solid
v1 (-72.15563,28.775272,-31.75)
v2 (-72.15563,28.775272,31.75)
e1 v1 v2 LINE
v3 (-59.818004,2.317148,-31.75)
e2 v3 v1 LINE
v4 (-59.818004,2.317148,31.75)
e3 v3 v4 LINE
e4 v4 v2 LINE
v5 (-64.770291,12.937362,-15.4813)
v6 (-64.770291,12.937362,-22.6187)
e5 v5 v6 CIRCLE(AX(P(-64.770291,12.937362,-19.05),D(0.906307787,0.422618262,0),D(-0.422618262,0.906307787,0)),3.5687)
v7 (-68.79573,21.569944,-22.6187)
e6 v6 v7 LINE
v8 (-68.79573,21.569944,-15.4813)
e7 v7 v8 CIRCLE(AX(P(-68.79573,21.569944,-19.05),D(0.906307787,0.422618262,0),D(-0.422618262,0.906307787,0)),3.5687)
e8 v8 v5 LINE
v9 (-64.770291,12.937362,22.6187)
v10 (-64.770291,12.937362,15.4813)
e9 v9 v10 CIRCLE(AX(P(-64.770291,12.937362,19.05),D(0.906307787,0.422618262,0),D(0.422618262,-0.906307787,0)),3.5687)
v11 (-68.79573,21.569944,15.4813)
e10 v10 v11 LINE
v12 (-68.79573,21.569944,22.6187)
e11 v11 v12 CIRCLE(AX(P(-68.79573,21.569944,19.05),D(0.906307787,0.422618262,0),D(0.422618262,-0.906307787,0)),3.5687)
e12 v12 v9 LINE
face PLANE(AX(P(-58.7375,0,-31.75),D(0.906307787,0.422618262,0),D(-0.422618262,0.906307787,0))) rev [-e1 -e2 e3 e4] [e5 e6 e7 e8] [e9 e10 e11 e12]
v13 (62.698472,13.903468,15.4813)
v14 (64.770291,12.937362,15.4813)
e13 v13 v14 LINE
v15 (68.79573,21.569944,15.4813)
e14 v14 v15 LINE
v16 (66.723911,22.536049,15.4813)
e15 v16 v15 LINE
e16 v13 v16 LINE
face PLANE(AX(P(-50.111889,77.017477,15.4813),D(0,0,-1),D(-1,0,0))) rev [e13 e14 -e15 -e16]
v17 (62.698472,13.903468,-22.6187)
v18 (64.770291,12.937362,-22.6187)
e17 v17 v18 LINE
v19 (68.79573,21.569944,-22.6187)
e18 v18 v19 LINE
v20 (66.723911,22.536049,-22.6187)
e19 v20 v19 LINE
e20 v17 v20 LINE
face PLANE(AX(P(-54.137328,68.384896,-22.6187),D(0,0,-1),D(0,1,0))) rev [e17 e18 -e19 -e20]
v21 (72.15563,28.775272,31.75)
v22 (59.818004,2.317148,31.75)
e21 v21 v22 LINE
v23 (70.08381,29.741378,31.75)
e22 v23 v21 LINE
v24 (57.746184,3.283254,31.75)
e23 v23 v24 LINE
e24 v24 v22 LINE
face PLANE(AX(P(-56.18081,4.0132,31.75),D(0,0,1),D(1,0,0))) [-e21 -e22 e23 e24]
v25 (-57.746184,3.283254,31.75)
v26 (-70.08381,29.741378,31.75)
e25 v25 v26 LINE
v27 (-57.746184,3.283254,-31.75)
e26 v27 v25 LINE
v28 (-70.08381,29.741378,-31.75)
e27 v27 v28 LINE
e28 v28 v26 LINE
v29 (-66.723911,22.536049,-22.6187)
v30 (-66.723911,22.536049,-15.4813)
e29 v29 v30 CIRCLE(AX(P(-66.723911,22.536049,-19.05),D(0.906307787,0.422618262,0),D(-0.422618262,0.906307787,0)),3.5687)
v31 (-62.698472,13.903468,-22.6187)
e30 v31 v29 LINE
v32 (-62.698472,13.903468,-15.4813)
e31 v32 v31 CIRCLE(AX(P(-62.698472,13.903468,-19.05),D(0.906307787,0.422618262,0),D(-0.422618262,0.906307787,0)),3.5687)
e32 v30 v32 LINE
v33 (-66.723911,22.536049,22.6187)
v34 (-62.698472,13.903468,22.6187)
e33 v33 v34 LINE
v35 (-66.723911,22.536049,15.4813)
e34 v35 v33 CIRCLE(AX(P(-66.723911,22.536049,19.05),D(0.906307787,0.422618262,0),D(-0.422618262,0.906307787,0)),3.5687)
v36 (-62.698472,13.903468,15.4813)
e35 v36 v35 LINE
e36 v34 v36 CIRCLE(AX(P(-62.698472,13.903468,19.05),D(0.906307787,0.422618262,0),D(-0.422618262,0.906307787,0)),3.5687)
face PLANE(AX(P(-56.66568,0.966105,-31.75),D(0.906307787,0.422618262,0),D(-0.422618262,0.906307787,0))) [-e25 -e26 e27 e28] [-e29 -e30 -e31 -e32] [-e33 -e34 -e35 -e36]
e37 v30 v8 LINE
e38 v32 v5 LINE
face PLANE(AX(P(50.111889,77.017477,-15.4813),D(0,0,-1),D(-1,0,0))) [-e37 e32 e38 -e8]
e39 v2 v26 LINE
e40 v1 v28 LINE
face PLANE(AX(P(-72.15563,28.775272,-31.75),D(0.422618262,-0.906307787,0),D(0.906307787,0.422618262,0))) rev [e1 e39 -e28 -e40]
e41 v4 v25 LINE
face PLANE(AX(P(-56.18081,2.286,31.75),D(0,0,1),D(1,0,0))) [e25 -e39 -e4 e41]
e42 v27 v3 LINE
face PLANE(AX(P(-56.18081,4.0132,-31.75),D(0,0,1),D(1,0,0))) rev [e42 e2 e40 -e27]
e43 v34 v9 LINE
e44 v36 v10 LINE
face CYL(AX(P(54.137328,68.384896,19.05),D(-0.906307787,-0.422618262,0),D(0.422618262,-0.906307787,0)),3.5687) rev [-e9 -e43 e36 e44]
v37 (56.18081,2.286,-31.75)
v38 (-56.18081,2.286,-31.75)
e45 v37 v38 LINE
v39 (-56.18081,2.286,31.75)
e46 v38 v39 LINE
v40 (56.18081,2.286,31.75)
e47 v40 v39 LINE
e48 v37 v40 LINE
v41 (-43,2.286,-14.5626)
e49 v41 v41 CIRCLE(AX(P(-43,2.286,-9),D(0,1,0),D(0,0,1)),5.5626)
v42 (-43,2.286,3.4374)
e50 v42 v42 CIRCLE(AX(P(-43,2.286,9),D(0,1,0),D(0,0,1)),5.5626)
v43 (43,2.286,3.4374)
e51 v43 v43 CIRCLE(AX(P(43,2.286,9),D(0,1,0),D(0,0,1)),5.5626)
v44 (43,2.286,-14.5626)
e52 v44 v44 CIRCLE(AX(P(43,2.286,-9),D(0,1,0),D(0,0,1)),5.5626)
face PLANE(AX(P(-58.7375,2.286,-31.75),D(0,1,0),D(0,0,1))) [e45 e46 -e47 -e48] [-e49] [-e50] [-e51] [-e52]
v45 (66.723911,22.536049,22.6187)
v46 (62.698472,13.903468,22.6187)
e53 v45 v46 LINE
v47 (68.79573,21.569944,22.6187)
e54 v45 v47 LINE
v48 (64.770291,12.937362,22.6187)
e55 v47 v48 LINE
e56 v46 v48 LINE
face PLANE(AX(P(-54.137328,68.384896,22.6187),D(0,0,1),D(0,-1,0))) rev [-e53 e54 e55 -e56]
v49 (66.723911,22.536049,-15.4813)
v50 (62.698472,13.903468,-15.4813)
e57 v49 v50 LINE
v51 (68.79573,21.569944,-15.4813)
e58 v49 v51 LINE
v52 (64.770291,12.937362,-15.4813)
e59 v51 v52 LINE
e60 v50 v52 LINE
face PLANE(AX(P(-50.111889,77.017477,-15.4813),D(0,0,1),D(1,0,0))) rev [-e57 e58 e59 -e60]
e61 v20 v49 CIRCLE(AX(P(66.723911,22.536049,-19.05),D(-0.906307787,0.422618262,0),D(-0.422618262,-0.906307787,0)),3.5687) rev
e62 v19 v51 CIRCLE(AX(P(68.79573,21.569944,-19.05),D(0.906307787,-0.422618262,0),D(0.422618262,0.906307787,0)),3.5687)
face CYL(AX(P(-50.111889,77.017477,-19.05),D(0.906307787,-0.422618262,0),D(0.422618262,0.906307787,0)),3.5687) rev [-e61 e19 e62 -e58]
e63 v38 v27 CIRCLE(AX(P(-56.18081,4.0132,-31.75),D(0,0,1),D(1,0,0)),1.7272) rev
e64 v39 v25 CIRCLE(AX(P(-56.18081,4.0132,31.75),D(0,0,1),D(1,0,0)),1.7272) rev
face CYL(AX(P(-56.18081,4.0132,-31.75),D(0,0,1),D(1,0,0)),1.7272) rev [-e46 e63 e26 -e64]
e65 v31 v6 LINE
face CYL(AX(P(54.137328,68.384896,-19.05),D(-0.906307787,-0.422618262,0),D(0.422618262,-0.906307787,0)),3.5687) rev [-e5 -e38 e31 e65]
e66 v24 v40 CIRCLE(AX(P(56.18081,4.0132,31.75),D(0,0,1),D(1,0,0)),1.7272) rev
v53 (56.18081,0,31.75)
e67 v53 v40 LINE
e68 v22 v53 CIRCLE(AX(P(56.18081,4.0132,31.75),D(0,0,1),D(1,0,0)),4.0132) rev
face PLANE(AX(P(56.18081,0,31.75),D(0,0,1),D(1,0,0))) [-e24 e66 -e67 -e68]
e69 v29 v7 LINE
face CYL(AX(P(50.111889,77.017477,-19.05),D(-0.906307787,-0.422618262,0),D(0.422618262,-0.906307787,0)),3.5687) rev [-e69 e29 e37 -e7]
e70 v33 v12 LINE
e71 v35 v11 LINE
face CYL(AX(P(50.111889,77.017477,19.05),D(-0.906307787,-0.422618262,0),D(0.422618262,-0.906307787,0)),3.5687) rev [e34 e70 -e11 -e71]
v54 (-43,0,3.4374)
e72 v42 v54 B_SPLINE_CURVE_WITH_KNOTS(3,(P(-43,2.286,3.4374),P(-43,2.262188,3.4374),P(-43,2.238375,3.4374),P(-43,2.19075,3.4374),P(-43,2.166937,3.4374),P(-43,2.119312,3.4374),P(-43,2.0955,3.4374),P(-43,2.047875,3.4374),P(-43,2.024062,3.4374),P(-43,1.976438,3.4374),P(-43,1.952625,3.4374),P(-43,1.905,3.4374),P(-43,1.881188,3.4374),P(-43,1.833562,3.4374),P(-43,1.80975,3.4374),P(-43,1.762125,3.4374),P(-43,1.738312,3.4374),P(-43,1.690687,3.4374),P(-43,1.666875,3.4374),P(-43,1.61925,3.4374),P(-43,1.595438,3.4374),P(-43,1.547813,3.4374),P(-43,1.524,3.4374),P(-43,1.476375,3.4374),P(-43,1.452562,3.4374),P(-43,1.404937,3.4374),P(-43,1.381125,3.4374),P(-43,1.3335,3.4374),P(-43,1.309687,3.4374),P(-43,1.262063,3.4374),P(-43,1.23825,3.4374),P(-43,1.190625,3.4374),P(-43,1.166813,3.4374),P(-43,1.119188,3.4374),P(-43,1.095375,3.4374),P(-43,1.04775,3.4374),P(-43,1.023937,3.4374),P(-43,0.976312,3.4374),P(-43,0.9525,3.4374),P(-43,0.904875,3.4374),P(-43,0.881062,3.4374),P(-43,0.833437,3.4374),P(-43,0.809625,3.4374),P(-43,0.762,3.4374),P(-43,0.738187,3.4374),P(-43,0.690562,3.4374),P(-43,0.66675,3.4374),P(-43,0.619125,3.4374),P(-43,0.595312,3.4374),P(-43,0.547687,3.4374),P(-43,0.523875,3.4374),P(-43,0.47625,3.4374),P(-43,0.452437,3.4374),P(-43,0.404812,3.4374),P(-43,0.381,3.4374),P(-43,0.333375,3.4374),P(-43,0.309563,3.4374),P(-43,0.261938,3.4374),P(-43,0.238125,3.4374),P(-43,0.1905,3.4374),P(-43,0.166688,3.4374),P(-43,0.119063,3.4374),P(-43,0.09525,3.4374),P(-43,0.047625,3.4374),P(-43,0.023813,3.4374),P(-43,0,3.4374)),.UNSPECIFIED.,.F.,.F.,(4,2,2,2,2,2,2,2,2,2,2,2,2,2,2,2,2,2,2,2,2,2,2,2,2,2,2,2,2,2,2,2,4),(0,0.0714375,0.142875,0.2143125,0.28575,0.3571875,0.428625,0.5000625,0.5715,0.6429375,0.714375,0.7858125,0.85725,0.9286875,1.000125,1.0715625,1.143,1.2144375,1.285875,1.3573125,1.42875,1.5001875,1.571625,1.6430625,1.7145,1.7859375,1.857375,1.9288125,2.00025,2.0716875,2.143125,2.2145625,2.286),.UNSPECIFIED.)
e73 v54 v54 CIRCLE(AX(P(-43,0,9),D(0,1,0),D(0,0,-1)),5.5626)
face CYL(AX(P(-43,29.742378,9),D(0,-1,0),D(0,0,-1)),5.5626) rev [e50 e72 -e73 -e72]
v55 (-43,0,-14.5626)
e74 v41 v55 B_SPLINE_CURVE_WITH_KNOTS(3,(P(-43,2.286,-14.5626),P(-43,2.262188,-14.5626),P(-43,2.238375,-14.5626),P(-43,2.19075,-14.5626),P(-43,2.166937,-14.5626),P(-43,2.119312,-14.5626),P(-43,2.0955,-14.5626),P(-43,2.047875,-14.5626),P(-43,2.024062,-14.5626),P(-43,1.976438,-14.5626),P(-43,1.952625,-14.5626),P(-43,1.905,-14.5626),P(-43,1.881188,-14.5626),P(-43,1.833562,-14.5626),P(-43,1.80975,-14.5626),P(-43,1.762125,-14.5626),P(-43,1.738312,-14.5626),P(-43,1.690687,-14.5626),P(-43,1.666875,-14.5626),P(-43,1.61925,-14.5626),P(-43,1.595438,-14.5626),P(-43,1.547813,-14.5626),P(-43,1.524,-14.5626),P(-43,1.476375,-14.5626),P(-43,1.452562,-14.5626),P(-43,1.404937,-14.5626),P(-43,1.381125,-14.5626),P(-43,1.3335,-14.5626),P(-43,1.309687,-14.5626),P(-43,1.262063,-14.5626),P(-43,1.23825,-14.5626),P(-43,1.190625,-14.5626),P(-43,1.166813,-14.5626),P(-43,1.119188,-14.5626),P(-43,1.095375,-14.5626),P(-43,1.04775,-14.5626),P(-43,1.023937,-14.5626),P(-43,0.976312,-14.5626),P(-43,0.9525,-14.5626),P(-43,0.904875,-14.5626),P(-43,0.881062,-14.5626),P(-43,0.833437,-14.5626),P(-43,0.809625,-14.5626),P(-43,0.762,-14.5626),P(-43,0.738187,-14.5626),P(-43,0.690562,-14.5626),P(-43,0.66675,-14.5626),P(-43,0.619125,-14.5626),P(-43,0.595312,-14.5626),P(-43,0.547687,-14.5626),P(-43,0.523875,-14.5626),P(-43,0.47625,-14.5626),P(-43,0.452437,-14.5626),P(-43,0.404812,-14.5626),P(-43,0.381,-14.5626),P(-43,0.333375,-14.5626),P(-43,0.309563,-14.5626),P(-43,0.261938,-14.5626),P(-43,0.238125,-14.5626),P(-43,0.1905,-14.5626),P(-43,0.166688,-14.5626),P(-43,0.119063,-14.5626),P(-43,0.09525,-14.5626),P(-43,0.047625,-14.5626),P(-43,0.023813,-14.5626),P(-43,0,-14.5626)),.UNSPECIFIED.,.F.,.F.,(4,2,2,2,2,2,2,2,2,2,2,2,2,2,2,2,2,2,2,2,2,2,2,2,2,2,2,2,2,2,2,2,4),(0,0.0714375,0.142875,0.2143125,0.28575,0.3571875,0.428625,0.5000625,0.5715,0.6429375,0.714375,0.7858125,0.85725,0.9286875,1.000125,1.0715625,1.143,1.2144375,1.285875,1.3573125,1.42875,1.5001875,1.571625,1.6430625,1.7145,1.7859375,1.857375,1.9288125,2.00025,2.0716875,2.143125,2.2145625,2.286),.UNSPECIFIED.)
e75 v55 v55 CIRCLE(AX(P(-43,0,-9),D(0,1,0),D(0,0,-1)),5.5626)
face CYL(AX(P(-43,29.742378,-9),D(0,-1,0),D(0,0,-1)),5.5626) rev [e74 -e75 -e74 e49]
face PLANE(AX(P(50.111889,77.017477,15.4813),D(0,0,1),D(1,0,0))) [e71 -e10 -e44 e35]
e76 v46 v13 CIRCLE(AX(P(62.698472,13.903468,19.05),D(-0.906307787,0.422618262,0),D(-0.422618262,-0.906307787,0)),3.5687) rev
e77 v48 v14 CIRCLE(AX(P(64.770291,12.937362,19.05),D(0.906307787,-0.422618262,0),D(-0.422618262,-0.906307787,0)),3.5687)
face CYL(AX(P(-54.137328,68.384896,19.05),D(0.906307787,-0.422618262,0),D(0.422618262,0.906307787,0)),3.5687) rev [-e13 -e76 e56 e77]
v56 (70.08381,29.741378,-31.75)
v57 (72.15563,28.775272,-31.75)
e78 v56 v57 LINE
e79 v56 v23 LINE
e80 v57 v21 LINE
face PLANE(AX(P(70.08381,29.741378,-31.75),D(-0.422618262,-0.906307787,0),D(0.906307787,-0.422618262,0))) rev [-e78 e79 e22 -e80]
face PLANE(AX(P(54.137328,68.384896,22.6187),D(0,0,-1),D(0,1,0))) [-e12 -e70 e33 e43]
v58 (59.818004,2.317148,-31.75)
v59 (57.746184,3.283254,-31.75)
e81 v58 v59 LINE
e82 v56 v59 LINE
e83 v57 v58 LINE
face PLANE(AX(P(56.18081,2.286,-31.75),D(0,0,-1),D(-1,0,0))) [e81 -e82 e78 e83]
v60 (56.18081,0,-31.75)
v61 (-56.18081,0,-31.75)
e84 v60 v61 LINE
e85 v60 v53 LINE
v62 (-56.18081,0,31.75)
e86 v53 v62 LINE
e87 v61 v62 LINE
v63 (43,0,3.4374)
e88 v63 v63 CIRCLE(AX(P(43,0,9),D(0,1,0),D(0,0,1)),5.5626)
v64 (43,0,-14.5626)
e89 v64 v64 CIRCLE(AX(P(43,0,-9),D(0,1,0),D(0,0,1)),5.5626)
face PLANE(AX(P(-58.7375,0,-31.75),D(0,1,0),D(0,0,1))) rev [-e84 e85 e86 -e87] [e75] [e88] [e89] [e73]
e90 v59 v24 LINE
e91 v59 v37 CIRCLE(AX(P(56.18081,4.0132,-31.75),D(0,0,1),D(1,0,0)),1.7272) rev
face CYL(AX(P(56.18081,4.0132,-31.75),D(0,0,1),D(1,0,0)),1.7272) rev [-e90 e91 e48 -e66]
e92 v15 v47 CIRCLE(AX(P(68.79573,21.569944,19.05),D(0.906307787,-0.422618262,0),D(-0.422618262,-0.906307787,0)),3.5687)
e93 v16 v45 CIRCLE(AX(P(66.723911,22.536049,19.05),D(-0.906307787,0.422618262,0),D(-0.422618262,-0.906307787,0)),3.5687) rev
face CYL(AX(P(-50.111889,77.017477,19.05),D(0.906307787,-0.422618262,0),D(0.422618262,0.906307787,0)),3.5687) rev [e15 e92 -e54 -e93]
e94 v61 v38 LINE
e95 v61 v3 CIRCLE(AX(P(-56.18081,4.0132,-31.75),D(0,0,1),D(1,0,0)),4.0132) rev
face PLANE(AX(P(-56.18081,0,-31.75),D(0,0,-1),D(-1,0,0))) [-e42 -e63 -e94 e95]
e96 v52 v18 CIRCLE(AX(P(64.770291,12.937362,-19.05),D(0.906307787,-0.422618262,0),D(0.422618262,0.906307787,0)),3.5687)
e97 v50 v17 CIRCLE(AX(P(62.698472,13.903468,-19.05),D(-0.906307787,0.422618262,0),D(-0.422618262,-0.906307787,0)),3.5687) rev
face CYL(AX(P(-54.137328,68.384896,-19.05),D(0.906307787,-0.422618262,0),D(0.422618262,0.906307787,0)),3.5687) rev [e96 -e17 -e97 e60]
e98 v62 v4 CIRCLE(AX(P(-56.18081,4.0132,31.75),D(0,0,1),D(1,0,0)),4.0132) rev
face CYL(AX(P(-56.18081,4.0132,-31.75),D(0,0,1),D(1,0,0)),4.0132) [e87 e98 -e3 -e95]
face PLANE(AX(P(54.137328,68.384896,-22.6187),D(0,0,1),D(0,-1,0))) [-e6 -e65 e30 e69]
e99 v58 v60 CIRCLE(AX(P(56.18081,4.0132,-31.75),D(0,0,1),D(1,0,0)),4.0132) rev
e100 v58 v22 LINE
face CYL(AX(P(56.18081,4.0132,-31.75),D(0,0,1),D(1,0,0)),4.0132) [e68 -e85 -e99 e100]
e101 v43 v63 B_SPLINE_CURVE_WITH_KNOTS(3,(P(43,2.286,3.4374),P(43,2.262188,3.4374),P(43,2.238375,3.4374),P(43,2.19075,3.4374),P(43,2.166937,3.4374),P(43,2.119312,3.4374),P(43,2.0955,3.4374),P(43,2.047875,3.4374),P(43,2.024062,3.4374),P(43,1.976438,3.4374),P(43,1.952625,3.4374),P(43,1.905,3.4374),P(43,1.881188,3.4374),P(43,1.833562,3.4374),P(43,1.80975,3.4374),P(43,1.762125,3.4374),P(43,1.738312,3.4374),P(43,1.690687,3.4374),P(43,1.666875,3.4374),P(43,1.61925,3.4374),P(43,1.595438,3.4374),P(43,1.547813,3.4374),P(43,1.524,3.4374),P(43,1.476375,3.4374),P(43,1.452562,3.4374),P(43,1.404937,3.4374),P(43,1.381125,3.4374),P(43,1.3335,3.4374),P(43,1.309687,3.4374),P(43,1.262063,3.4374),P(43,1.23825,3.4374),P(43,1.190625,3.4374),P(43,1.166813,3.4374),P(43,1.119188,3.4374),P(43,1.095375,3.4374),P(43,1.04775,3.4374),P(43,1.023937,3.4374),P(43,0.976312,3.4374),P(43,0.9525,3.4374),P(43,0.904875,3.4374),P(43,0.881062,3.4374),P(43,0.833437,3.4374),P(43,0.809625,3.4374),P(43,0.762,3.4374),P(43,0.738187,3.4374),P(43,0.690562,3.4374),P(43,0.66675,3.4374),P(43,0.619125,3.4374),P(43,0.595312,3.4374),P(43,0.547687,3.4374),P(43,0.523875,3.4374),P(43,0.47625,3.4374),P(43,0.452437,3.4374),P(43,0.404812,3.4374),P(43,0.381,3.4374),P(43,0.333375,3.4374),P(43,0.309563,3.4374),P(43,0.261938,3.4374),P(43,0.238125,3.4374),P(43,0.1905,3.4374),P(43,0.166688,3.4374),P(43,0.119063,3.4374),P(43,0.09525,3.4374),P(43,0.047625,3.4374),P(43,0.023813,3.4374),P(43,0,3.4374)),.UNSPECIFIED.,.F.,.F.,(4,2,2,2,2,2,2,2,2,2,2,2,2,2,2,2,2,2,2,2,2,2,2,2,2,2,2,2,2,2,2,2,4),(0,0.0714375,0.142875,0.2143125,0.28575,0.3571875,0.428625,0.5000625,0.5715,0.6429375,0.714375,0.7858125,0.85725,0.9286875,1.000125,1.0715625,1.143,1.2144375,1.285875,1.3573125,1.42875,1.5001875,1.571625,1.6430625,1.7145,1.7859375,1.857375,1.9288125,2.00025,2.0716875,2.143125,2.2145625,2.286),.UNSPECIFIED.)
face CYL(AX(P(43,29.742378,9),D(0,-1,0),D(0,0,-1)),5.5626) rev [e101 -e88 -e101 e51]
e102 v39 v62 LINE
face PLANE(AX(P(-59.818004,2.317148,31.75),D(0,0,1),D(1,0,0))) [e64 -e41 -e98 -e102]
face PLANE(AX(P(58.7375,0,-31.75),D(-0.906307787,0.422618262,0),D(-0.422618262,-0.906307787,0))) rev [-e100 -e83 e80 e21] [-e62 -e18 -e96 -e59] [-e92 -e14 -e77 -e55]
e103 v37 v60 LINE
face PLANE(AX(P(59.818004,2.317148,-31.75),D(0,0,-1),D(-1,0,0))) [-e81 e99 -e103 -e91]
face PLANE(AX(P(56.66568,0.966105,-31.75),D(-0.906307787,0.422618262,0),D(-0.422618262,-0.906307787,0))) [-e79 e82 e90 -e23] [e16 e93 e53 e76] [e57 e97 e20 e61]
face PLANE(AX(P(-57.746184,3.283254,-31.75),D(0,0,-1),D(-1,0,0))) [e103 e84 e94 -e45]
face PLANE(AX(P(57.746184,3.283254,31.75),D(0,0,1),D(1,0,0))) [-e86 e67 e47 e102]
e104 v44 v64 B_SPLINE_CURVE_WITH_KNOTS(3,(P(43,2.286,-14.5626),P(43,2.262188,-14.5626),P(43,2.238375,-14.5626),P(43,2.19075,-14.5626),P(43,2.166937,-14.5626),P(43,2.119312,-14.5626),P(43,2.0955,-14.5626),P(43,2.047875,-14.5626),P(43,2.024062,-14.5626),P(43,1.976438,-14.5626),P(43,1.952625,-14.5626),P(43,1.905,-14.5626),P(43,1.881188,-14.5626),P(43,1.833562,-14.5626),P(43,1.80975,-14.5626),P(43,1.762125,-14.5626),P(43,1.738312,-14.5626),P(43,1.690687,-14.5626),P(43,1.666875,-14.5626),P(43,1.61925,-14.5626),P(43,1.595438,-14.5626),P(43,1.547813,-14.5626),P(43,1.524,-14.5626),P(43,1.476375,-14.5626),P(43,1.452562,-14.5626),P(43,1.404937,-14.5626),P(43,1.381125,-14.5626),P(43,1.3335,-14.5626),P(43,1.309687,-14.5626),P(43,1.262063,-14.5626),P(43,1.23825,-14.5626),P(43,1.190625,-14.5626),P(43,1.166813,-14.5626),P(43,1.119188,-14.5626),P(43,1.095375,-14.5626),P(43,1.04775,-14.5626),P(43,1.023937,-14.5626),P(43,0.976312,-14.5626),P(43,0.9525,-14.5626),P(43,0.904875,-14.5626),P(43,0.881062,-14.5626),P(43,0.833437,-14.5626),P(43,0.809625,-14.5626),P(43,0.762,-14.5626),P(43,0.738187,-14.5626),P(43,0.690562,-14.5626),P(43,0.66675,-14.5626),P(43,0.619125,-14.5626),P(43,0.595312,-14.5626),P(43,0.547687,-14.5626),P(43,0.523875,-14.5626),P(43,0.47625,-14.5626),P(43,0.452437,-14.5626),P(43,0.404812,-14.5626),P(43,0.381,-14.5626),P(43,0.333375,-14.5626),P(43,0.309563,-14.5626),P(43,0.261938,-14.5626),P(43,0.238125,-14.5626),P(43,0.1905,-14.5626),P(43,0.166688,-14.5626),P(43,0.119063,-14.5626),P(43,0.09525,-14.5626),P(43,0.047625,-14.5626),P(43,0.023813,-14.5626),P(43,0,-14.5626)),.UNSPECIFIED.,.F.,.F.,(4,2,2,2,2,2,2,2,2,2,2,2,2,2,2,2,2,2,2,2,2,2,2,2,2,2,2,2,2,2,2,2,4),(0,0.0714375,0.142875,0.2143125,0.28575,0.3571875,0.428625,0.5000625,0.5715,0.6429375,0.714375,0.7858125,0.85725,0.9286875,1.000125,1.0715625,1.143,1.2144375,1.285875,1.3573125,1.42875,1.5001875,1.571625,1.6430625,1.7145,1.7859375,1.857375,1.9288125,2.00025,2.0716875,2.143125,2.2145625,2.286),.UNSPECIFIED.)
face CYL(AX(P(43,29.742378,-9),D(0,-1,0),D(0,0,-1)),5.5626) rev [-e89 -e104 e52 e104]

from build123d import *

# Parameters (mm, degrees)
BASE_FLANGE1_DEPTH = 31.75
CUT_EXTRUDE1_REACH = 86.256
SKETCH3_R          = 5.5626
CUT_EXTRUDE2_REACH = 137.032


# Sheet-metal steps are written as plain solids
with BuildPart() as part:
    # Sketch1 → Base-Flange1 (new, symmetric)
    with BuildSketch(Plane.XY):
        with BuildLine():
            Line((-72.15562981, 28.775272238), (-59.81800404, 2.317148392))
            ThreePointArc((-59.81800404, 2.317148392), (-58.337100418, 0.62850145), (-56.180809629, 0))
            Line((-56.180809629, 0), (56.180809629, 0))
            ThreePointArc((56.180809629, 0), (58.337100418, 0.62850145), (59.81800404, 2.317148392))
            Line((59.81800404, 2.317148392), (72.15562981, 28.775272238))
            Line((72.15562981, 28.775272238), (70.083810209, 29.741377585))
            Line((70.083810209, 29.741377585), (57.746184439, 3.283253738))
            ThreePointArc((57.746184439, 3.283253738), (57.108833513, 2.556494295), (56.180809629, 2.286))
            Line((56.180809629, 2.286), (-56.180809629, 2.286))
            ThreePointArc((-56.180809629, 2.286), (-57.108833513, 2.556494295), (-57.746184439, 3.283253738))
            Line((-57.746184439, 3.283253738), (-70.083810209, 29.741377585))
            Line((-70.083810209, 29.741377585), (-72.15562981, 28.775272238))
        make_face()
    extrude(amount=BASE_FLANGE1_DEPTH, both=True)

    # Sketch3 → Cut-Extrude1 (cut, up to next)
    with BuildSketch(Plane(origin=(0, 0, 0), x_dir=(1, 0, 0), z_dir=(0, 1, 0)), mode=Mode.PRIVATE) as cut_extrude1_sk1:
        with Locations(Location((43, 9, 0), (0, 0, 90))):
            Circle(SKETCH3_R)
    cut_extrude1_tool1 = extrude(cut_extrude1_sk1.sketch, amount=CUT_EXTRUDE1_REACH, mode=Mode.PRIVATE) & part.part
    # Sketch3 → Cut-Extrude1 (cut, up to next)
    with BuildSketch(Plane(origin=(0, 0, 0), x_dir=(1, 0, 0), z_dir=(0, 1, 0)), mode=Mode.PRIVATE) as cut_extrude1_sk2:
        with Locations(Location((43, -9, 0), (0, 0, 90))):
            Circle(SKETCH3_R)
    cut_extrude1_tool2 = extrude(cut_extrude1_sk2.sketch, amount=CUT_EXTRUDE1_REACH, mode=Mode.PRIVATE) & part.part
    # Sketch3 → Cut-Extrude1 (cut, up to next)
    with BuildSketch(Plane(origin=(0, 0, 0), x_dir=(1, 0, 0), z_dir=(0, 1, 0)), mode=Mode.PRIVATE) as cut_extrude1_sk3:
        with Locations(Location((-43, -9, 0), (0, 0, 90))):
            Circle(SKETCH3_R)
    cut_extrude1_tool3 = extrude(cut_extrude1_sk3.sketch, amount=CUT_EXTRUDE1_REACH, mode=Mode.PRIVATE) & part.part
    # Sketch3 → Cut-Extrude1 (cut, up to next)
    with BuildSketch(Plane(origin=(0, 0, 0), x_dir=(1, 0, 0), z_dir=(0, 1, 0)), mode=Mode.PRIVATE) as cut_extrude1_sk4:
        with Locations(Location((-43, 9, 0), (0, 0, 90))):
            Circle(SKETCH3_R)
    cut_extrude1_tool4 = extrude(cut_extrude1_sk4.sketch, amount=CUT_EXTRUDE1_REACH, mode=Mode.PRIVATE) & part.part
    add(cut_extrude1_tool1.solids().sort_by_distance((43, 0, -9))[0], mode=Mode.SUBTRACT)
    add(cut_extrude1_tool2.solids().sort_by_distance((43, 0, 9))[0], mode=Mode.SUBTRACT)
    add(cut_extrude1_tool3.solids().sort_by_distance((-43, 0, 9))[0], mode=Mode.SUBTRACT)
    add(cut_extrude1_tool4.solids().sort_by_distance((-43, 0, -9))[0], mode=Mode.SUBTRACT)

    # Sketch4 → Cut-Extrude2 (cut, up to next)
    with BuildSketch(Plane(origin=(48.246618612, -22.497767739, 0), x_dir=(0, 0, -1), z_dir=(0.9063077870366514, -0.4226182617406968, 0)), mode=Mode.PRIVATE) as cut_extrude2_sk1:
        with BuildLine():
            Line((22.6187, 39.098340149), (22.6187, 48.623340149))
            ThreePointArc((22.6187, 48.623340149), (19.05, 52.192040149), (15.4813, 48.623340149))
            Line((15.4813, 48.623340149), (15.4813, 39.098340149))
            ThreePointArc((15.4813, 39.098340149), (19.05, 35.529640149), (22.6187, 39.098340149))
        make_face()
    cut_extrude2_tool1 = extrude(cut_extrude2_sk1.sketch, amount=-CUT_EXTRUDE2_REACH, mode=Mode.PRIVATE) & part.part
    # Sketch4 → Cut-Extrude2 (cut, up to next)
    with BuildSketch(Plane(origin=(48.246618612, -22.497767739, 0), x_dir=(0, 0, -1), z_dir=(0.9063077870366514, -0.4226182617406968, 0)), mode=Mode.PRIVATE) as cut_extrude2_sk2:
        with BuildLine():
            Line((-15.4813, 48.623340149), (-15.4813, 39.098340149))
            ThreePointArc((-15.4813, 39.098340149), (-19.05, 35.529640149), (-22.6187, 39.098340149))
            Line((-22.6187, 39.098340149), (-22.6187, 48.623340149))
            ThreePointArc((-22.6187, 48.623340149), (-19.05, 52.192040149), (-15.4813, 48.623340149))
        make_face()
    cut_extrude2_tool2 = extrude(cut_extrude2_sk2.sketch, amount=-CUT_EXTRUDE2_REACH, mode=Mode.PRIVATE) & part.part
    cut_extrude2_1 = cut_extrude2_tool1.solids().sort_by_distance((66.783011, 17.253653, -19.05))[0]
    add(cut_extrude2_1, mode=Mode.SUBTRACT)
    cut_extrude2_2 = cut_extrude2_tool2.solids().sort_by_distance((66.783011, 17.253653, 19.05))[0]
    add(cut_extrude2_2, mode=Mode.SUBTRACT)
    cut_extrude2 = cut_extrude2_1 + cut_extrude2_2  # Cut-Extrude2 as one shape, for the pattern or mirror that repeats it

    # Mirror1: Cut-Extrude2 across plane
    add(cut_extrude2.mirror(Plane(origin=(0, 0, 0), x_dir=(0, 0, 1), z_dir=(1, 0, 0))), mode=Mode.SUBTRACT)


solid = part.part
